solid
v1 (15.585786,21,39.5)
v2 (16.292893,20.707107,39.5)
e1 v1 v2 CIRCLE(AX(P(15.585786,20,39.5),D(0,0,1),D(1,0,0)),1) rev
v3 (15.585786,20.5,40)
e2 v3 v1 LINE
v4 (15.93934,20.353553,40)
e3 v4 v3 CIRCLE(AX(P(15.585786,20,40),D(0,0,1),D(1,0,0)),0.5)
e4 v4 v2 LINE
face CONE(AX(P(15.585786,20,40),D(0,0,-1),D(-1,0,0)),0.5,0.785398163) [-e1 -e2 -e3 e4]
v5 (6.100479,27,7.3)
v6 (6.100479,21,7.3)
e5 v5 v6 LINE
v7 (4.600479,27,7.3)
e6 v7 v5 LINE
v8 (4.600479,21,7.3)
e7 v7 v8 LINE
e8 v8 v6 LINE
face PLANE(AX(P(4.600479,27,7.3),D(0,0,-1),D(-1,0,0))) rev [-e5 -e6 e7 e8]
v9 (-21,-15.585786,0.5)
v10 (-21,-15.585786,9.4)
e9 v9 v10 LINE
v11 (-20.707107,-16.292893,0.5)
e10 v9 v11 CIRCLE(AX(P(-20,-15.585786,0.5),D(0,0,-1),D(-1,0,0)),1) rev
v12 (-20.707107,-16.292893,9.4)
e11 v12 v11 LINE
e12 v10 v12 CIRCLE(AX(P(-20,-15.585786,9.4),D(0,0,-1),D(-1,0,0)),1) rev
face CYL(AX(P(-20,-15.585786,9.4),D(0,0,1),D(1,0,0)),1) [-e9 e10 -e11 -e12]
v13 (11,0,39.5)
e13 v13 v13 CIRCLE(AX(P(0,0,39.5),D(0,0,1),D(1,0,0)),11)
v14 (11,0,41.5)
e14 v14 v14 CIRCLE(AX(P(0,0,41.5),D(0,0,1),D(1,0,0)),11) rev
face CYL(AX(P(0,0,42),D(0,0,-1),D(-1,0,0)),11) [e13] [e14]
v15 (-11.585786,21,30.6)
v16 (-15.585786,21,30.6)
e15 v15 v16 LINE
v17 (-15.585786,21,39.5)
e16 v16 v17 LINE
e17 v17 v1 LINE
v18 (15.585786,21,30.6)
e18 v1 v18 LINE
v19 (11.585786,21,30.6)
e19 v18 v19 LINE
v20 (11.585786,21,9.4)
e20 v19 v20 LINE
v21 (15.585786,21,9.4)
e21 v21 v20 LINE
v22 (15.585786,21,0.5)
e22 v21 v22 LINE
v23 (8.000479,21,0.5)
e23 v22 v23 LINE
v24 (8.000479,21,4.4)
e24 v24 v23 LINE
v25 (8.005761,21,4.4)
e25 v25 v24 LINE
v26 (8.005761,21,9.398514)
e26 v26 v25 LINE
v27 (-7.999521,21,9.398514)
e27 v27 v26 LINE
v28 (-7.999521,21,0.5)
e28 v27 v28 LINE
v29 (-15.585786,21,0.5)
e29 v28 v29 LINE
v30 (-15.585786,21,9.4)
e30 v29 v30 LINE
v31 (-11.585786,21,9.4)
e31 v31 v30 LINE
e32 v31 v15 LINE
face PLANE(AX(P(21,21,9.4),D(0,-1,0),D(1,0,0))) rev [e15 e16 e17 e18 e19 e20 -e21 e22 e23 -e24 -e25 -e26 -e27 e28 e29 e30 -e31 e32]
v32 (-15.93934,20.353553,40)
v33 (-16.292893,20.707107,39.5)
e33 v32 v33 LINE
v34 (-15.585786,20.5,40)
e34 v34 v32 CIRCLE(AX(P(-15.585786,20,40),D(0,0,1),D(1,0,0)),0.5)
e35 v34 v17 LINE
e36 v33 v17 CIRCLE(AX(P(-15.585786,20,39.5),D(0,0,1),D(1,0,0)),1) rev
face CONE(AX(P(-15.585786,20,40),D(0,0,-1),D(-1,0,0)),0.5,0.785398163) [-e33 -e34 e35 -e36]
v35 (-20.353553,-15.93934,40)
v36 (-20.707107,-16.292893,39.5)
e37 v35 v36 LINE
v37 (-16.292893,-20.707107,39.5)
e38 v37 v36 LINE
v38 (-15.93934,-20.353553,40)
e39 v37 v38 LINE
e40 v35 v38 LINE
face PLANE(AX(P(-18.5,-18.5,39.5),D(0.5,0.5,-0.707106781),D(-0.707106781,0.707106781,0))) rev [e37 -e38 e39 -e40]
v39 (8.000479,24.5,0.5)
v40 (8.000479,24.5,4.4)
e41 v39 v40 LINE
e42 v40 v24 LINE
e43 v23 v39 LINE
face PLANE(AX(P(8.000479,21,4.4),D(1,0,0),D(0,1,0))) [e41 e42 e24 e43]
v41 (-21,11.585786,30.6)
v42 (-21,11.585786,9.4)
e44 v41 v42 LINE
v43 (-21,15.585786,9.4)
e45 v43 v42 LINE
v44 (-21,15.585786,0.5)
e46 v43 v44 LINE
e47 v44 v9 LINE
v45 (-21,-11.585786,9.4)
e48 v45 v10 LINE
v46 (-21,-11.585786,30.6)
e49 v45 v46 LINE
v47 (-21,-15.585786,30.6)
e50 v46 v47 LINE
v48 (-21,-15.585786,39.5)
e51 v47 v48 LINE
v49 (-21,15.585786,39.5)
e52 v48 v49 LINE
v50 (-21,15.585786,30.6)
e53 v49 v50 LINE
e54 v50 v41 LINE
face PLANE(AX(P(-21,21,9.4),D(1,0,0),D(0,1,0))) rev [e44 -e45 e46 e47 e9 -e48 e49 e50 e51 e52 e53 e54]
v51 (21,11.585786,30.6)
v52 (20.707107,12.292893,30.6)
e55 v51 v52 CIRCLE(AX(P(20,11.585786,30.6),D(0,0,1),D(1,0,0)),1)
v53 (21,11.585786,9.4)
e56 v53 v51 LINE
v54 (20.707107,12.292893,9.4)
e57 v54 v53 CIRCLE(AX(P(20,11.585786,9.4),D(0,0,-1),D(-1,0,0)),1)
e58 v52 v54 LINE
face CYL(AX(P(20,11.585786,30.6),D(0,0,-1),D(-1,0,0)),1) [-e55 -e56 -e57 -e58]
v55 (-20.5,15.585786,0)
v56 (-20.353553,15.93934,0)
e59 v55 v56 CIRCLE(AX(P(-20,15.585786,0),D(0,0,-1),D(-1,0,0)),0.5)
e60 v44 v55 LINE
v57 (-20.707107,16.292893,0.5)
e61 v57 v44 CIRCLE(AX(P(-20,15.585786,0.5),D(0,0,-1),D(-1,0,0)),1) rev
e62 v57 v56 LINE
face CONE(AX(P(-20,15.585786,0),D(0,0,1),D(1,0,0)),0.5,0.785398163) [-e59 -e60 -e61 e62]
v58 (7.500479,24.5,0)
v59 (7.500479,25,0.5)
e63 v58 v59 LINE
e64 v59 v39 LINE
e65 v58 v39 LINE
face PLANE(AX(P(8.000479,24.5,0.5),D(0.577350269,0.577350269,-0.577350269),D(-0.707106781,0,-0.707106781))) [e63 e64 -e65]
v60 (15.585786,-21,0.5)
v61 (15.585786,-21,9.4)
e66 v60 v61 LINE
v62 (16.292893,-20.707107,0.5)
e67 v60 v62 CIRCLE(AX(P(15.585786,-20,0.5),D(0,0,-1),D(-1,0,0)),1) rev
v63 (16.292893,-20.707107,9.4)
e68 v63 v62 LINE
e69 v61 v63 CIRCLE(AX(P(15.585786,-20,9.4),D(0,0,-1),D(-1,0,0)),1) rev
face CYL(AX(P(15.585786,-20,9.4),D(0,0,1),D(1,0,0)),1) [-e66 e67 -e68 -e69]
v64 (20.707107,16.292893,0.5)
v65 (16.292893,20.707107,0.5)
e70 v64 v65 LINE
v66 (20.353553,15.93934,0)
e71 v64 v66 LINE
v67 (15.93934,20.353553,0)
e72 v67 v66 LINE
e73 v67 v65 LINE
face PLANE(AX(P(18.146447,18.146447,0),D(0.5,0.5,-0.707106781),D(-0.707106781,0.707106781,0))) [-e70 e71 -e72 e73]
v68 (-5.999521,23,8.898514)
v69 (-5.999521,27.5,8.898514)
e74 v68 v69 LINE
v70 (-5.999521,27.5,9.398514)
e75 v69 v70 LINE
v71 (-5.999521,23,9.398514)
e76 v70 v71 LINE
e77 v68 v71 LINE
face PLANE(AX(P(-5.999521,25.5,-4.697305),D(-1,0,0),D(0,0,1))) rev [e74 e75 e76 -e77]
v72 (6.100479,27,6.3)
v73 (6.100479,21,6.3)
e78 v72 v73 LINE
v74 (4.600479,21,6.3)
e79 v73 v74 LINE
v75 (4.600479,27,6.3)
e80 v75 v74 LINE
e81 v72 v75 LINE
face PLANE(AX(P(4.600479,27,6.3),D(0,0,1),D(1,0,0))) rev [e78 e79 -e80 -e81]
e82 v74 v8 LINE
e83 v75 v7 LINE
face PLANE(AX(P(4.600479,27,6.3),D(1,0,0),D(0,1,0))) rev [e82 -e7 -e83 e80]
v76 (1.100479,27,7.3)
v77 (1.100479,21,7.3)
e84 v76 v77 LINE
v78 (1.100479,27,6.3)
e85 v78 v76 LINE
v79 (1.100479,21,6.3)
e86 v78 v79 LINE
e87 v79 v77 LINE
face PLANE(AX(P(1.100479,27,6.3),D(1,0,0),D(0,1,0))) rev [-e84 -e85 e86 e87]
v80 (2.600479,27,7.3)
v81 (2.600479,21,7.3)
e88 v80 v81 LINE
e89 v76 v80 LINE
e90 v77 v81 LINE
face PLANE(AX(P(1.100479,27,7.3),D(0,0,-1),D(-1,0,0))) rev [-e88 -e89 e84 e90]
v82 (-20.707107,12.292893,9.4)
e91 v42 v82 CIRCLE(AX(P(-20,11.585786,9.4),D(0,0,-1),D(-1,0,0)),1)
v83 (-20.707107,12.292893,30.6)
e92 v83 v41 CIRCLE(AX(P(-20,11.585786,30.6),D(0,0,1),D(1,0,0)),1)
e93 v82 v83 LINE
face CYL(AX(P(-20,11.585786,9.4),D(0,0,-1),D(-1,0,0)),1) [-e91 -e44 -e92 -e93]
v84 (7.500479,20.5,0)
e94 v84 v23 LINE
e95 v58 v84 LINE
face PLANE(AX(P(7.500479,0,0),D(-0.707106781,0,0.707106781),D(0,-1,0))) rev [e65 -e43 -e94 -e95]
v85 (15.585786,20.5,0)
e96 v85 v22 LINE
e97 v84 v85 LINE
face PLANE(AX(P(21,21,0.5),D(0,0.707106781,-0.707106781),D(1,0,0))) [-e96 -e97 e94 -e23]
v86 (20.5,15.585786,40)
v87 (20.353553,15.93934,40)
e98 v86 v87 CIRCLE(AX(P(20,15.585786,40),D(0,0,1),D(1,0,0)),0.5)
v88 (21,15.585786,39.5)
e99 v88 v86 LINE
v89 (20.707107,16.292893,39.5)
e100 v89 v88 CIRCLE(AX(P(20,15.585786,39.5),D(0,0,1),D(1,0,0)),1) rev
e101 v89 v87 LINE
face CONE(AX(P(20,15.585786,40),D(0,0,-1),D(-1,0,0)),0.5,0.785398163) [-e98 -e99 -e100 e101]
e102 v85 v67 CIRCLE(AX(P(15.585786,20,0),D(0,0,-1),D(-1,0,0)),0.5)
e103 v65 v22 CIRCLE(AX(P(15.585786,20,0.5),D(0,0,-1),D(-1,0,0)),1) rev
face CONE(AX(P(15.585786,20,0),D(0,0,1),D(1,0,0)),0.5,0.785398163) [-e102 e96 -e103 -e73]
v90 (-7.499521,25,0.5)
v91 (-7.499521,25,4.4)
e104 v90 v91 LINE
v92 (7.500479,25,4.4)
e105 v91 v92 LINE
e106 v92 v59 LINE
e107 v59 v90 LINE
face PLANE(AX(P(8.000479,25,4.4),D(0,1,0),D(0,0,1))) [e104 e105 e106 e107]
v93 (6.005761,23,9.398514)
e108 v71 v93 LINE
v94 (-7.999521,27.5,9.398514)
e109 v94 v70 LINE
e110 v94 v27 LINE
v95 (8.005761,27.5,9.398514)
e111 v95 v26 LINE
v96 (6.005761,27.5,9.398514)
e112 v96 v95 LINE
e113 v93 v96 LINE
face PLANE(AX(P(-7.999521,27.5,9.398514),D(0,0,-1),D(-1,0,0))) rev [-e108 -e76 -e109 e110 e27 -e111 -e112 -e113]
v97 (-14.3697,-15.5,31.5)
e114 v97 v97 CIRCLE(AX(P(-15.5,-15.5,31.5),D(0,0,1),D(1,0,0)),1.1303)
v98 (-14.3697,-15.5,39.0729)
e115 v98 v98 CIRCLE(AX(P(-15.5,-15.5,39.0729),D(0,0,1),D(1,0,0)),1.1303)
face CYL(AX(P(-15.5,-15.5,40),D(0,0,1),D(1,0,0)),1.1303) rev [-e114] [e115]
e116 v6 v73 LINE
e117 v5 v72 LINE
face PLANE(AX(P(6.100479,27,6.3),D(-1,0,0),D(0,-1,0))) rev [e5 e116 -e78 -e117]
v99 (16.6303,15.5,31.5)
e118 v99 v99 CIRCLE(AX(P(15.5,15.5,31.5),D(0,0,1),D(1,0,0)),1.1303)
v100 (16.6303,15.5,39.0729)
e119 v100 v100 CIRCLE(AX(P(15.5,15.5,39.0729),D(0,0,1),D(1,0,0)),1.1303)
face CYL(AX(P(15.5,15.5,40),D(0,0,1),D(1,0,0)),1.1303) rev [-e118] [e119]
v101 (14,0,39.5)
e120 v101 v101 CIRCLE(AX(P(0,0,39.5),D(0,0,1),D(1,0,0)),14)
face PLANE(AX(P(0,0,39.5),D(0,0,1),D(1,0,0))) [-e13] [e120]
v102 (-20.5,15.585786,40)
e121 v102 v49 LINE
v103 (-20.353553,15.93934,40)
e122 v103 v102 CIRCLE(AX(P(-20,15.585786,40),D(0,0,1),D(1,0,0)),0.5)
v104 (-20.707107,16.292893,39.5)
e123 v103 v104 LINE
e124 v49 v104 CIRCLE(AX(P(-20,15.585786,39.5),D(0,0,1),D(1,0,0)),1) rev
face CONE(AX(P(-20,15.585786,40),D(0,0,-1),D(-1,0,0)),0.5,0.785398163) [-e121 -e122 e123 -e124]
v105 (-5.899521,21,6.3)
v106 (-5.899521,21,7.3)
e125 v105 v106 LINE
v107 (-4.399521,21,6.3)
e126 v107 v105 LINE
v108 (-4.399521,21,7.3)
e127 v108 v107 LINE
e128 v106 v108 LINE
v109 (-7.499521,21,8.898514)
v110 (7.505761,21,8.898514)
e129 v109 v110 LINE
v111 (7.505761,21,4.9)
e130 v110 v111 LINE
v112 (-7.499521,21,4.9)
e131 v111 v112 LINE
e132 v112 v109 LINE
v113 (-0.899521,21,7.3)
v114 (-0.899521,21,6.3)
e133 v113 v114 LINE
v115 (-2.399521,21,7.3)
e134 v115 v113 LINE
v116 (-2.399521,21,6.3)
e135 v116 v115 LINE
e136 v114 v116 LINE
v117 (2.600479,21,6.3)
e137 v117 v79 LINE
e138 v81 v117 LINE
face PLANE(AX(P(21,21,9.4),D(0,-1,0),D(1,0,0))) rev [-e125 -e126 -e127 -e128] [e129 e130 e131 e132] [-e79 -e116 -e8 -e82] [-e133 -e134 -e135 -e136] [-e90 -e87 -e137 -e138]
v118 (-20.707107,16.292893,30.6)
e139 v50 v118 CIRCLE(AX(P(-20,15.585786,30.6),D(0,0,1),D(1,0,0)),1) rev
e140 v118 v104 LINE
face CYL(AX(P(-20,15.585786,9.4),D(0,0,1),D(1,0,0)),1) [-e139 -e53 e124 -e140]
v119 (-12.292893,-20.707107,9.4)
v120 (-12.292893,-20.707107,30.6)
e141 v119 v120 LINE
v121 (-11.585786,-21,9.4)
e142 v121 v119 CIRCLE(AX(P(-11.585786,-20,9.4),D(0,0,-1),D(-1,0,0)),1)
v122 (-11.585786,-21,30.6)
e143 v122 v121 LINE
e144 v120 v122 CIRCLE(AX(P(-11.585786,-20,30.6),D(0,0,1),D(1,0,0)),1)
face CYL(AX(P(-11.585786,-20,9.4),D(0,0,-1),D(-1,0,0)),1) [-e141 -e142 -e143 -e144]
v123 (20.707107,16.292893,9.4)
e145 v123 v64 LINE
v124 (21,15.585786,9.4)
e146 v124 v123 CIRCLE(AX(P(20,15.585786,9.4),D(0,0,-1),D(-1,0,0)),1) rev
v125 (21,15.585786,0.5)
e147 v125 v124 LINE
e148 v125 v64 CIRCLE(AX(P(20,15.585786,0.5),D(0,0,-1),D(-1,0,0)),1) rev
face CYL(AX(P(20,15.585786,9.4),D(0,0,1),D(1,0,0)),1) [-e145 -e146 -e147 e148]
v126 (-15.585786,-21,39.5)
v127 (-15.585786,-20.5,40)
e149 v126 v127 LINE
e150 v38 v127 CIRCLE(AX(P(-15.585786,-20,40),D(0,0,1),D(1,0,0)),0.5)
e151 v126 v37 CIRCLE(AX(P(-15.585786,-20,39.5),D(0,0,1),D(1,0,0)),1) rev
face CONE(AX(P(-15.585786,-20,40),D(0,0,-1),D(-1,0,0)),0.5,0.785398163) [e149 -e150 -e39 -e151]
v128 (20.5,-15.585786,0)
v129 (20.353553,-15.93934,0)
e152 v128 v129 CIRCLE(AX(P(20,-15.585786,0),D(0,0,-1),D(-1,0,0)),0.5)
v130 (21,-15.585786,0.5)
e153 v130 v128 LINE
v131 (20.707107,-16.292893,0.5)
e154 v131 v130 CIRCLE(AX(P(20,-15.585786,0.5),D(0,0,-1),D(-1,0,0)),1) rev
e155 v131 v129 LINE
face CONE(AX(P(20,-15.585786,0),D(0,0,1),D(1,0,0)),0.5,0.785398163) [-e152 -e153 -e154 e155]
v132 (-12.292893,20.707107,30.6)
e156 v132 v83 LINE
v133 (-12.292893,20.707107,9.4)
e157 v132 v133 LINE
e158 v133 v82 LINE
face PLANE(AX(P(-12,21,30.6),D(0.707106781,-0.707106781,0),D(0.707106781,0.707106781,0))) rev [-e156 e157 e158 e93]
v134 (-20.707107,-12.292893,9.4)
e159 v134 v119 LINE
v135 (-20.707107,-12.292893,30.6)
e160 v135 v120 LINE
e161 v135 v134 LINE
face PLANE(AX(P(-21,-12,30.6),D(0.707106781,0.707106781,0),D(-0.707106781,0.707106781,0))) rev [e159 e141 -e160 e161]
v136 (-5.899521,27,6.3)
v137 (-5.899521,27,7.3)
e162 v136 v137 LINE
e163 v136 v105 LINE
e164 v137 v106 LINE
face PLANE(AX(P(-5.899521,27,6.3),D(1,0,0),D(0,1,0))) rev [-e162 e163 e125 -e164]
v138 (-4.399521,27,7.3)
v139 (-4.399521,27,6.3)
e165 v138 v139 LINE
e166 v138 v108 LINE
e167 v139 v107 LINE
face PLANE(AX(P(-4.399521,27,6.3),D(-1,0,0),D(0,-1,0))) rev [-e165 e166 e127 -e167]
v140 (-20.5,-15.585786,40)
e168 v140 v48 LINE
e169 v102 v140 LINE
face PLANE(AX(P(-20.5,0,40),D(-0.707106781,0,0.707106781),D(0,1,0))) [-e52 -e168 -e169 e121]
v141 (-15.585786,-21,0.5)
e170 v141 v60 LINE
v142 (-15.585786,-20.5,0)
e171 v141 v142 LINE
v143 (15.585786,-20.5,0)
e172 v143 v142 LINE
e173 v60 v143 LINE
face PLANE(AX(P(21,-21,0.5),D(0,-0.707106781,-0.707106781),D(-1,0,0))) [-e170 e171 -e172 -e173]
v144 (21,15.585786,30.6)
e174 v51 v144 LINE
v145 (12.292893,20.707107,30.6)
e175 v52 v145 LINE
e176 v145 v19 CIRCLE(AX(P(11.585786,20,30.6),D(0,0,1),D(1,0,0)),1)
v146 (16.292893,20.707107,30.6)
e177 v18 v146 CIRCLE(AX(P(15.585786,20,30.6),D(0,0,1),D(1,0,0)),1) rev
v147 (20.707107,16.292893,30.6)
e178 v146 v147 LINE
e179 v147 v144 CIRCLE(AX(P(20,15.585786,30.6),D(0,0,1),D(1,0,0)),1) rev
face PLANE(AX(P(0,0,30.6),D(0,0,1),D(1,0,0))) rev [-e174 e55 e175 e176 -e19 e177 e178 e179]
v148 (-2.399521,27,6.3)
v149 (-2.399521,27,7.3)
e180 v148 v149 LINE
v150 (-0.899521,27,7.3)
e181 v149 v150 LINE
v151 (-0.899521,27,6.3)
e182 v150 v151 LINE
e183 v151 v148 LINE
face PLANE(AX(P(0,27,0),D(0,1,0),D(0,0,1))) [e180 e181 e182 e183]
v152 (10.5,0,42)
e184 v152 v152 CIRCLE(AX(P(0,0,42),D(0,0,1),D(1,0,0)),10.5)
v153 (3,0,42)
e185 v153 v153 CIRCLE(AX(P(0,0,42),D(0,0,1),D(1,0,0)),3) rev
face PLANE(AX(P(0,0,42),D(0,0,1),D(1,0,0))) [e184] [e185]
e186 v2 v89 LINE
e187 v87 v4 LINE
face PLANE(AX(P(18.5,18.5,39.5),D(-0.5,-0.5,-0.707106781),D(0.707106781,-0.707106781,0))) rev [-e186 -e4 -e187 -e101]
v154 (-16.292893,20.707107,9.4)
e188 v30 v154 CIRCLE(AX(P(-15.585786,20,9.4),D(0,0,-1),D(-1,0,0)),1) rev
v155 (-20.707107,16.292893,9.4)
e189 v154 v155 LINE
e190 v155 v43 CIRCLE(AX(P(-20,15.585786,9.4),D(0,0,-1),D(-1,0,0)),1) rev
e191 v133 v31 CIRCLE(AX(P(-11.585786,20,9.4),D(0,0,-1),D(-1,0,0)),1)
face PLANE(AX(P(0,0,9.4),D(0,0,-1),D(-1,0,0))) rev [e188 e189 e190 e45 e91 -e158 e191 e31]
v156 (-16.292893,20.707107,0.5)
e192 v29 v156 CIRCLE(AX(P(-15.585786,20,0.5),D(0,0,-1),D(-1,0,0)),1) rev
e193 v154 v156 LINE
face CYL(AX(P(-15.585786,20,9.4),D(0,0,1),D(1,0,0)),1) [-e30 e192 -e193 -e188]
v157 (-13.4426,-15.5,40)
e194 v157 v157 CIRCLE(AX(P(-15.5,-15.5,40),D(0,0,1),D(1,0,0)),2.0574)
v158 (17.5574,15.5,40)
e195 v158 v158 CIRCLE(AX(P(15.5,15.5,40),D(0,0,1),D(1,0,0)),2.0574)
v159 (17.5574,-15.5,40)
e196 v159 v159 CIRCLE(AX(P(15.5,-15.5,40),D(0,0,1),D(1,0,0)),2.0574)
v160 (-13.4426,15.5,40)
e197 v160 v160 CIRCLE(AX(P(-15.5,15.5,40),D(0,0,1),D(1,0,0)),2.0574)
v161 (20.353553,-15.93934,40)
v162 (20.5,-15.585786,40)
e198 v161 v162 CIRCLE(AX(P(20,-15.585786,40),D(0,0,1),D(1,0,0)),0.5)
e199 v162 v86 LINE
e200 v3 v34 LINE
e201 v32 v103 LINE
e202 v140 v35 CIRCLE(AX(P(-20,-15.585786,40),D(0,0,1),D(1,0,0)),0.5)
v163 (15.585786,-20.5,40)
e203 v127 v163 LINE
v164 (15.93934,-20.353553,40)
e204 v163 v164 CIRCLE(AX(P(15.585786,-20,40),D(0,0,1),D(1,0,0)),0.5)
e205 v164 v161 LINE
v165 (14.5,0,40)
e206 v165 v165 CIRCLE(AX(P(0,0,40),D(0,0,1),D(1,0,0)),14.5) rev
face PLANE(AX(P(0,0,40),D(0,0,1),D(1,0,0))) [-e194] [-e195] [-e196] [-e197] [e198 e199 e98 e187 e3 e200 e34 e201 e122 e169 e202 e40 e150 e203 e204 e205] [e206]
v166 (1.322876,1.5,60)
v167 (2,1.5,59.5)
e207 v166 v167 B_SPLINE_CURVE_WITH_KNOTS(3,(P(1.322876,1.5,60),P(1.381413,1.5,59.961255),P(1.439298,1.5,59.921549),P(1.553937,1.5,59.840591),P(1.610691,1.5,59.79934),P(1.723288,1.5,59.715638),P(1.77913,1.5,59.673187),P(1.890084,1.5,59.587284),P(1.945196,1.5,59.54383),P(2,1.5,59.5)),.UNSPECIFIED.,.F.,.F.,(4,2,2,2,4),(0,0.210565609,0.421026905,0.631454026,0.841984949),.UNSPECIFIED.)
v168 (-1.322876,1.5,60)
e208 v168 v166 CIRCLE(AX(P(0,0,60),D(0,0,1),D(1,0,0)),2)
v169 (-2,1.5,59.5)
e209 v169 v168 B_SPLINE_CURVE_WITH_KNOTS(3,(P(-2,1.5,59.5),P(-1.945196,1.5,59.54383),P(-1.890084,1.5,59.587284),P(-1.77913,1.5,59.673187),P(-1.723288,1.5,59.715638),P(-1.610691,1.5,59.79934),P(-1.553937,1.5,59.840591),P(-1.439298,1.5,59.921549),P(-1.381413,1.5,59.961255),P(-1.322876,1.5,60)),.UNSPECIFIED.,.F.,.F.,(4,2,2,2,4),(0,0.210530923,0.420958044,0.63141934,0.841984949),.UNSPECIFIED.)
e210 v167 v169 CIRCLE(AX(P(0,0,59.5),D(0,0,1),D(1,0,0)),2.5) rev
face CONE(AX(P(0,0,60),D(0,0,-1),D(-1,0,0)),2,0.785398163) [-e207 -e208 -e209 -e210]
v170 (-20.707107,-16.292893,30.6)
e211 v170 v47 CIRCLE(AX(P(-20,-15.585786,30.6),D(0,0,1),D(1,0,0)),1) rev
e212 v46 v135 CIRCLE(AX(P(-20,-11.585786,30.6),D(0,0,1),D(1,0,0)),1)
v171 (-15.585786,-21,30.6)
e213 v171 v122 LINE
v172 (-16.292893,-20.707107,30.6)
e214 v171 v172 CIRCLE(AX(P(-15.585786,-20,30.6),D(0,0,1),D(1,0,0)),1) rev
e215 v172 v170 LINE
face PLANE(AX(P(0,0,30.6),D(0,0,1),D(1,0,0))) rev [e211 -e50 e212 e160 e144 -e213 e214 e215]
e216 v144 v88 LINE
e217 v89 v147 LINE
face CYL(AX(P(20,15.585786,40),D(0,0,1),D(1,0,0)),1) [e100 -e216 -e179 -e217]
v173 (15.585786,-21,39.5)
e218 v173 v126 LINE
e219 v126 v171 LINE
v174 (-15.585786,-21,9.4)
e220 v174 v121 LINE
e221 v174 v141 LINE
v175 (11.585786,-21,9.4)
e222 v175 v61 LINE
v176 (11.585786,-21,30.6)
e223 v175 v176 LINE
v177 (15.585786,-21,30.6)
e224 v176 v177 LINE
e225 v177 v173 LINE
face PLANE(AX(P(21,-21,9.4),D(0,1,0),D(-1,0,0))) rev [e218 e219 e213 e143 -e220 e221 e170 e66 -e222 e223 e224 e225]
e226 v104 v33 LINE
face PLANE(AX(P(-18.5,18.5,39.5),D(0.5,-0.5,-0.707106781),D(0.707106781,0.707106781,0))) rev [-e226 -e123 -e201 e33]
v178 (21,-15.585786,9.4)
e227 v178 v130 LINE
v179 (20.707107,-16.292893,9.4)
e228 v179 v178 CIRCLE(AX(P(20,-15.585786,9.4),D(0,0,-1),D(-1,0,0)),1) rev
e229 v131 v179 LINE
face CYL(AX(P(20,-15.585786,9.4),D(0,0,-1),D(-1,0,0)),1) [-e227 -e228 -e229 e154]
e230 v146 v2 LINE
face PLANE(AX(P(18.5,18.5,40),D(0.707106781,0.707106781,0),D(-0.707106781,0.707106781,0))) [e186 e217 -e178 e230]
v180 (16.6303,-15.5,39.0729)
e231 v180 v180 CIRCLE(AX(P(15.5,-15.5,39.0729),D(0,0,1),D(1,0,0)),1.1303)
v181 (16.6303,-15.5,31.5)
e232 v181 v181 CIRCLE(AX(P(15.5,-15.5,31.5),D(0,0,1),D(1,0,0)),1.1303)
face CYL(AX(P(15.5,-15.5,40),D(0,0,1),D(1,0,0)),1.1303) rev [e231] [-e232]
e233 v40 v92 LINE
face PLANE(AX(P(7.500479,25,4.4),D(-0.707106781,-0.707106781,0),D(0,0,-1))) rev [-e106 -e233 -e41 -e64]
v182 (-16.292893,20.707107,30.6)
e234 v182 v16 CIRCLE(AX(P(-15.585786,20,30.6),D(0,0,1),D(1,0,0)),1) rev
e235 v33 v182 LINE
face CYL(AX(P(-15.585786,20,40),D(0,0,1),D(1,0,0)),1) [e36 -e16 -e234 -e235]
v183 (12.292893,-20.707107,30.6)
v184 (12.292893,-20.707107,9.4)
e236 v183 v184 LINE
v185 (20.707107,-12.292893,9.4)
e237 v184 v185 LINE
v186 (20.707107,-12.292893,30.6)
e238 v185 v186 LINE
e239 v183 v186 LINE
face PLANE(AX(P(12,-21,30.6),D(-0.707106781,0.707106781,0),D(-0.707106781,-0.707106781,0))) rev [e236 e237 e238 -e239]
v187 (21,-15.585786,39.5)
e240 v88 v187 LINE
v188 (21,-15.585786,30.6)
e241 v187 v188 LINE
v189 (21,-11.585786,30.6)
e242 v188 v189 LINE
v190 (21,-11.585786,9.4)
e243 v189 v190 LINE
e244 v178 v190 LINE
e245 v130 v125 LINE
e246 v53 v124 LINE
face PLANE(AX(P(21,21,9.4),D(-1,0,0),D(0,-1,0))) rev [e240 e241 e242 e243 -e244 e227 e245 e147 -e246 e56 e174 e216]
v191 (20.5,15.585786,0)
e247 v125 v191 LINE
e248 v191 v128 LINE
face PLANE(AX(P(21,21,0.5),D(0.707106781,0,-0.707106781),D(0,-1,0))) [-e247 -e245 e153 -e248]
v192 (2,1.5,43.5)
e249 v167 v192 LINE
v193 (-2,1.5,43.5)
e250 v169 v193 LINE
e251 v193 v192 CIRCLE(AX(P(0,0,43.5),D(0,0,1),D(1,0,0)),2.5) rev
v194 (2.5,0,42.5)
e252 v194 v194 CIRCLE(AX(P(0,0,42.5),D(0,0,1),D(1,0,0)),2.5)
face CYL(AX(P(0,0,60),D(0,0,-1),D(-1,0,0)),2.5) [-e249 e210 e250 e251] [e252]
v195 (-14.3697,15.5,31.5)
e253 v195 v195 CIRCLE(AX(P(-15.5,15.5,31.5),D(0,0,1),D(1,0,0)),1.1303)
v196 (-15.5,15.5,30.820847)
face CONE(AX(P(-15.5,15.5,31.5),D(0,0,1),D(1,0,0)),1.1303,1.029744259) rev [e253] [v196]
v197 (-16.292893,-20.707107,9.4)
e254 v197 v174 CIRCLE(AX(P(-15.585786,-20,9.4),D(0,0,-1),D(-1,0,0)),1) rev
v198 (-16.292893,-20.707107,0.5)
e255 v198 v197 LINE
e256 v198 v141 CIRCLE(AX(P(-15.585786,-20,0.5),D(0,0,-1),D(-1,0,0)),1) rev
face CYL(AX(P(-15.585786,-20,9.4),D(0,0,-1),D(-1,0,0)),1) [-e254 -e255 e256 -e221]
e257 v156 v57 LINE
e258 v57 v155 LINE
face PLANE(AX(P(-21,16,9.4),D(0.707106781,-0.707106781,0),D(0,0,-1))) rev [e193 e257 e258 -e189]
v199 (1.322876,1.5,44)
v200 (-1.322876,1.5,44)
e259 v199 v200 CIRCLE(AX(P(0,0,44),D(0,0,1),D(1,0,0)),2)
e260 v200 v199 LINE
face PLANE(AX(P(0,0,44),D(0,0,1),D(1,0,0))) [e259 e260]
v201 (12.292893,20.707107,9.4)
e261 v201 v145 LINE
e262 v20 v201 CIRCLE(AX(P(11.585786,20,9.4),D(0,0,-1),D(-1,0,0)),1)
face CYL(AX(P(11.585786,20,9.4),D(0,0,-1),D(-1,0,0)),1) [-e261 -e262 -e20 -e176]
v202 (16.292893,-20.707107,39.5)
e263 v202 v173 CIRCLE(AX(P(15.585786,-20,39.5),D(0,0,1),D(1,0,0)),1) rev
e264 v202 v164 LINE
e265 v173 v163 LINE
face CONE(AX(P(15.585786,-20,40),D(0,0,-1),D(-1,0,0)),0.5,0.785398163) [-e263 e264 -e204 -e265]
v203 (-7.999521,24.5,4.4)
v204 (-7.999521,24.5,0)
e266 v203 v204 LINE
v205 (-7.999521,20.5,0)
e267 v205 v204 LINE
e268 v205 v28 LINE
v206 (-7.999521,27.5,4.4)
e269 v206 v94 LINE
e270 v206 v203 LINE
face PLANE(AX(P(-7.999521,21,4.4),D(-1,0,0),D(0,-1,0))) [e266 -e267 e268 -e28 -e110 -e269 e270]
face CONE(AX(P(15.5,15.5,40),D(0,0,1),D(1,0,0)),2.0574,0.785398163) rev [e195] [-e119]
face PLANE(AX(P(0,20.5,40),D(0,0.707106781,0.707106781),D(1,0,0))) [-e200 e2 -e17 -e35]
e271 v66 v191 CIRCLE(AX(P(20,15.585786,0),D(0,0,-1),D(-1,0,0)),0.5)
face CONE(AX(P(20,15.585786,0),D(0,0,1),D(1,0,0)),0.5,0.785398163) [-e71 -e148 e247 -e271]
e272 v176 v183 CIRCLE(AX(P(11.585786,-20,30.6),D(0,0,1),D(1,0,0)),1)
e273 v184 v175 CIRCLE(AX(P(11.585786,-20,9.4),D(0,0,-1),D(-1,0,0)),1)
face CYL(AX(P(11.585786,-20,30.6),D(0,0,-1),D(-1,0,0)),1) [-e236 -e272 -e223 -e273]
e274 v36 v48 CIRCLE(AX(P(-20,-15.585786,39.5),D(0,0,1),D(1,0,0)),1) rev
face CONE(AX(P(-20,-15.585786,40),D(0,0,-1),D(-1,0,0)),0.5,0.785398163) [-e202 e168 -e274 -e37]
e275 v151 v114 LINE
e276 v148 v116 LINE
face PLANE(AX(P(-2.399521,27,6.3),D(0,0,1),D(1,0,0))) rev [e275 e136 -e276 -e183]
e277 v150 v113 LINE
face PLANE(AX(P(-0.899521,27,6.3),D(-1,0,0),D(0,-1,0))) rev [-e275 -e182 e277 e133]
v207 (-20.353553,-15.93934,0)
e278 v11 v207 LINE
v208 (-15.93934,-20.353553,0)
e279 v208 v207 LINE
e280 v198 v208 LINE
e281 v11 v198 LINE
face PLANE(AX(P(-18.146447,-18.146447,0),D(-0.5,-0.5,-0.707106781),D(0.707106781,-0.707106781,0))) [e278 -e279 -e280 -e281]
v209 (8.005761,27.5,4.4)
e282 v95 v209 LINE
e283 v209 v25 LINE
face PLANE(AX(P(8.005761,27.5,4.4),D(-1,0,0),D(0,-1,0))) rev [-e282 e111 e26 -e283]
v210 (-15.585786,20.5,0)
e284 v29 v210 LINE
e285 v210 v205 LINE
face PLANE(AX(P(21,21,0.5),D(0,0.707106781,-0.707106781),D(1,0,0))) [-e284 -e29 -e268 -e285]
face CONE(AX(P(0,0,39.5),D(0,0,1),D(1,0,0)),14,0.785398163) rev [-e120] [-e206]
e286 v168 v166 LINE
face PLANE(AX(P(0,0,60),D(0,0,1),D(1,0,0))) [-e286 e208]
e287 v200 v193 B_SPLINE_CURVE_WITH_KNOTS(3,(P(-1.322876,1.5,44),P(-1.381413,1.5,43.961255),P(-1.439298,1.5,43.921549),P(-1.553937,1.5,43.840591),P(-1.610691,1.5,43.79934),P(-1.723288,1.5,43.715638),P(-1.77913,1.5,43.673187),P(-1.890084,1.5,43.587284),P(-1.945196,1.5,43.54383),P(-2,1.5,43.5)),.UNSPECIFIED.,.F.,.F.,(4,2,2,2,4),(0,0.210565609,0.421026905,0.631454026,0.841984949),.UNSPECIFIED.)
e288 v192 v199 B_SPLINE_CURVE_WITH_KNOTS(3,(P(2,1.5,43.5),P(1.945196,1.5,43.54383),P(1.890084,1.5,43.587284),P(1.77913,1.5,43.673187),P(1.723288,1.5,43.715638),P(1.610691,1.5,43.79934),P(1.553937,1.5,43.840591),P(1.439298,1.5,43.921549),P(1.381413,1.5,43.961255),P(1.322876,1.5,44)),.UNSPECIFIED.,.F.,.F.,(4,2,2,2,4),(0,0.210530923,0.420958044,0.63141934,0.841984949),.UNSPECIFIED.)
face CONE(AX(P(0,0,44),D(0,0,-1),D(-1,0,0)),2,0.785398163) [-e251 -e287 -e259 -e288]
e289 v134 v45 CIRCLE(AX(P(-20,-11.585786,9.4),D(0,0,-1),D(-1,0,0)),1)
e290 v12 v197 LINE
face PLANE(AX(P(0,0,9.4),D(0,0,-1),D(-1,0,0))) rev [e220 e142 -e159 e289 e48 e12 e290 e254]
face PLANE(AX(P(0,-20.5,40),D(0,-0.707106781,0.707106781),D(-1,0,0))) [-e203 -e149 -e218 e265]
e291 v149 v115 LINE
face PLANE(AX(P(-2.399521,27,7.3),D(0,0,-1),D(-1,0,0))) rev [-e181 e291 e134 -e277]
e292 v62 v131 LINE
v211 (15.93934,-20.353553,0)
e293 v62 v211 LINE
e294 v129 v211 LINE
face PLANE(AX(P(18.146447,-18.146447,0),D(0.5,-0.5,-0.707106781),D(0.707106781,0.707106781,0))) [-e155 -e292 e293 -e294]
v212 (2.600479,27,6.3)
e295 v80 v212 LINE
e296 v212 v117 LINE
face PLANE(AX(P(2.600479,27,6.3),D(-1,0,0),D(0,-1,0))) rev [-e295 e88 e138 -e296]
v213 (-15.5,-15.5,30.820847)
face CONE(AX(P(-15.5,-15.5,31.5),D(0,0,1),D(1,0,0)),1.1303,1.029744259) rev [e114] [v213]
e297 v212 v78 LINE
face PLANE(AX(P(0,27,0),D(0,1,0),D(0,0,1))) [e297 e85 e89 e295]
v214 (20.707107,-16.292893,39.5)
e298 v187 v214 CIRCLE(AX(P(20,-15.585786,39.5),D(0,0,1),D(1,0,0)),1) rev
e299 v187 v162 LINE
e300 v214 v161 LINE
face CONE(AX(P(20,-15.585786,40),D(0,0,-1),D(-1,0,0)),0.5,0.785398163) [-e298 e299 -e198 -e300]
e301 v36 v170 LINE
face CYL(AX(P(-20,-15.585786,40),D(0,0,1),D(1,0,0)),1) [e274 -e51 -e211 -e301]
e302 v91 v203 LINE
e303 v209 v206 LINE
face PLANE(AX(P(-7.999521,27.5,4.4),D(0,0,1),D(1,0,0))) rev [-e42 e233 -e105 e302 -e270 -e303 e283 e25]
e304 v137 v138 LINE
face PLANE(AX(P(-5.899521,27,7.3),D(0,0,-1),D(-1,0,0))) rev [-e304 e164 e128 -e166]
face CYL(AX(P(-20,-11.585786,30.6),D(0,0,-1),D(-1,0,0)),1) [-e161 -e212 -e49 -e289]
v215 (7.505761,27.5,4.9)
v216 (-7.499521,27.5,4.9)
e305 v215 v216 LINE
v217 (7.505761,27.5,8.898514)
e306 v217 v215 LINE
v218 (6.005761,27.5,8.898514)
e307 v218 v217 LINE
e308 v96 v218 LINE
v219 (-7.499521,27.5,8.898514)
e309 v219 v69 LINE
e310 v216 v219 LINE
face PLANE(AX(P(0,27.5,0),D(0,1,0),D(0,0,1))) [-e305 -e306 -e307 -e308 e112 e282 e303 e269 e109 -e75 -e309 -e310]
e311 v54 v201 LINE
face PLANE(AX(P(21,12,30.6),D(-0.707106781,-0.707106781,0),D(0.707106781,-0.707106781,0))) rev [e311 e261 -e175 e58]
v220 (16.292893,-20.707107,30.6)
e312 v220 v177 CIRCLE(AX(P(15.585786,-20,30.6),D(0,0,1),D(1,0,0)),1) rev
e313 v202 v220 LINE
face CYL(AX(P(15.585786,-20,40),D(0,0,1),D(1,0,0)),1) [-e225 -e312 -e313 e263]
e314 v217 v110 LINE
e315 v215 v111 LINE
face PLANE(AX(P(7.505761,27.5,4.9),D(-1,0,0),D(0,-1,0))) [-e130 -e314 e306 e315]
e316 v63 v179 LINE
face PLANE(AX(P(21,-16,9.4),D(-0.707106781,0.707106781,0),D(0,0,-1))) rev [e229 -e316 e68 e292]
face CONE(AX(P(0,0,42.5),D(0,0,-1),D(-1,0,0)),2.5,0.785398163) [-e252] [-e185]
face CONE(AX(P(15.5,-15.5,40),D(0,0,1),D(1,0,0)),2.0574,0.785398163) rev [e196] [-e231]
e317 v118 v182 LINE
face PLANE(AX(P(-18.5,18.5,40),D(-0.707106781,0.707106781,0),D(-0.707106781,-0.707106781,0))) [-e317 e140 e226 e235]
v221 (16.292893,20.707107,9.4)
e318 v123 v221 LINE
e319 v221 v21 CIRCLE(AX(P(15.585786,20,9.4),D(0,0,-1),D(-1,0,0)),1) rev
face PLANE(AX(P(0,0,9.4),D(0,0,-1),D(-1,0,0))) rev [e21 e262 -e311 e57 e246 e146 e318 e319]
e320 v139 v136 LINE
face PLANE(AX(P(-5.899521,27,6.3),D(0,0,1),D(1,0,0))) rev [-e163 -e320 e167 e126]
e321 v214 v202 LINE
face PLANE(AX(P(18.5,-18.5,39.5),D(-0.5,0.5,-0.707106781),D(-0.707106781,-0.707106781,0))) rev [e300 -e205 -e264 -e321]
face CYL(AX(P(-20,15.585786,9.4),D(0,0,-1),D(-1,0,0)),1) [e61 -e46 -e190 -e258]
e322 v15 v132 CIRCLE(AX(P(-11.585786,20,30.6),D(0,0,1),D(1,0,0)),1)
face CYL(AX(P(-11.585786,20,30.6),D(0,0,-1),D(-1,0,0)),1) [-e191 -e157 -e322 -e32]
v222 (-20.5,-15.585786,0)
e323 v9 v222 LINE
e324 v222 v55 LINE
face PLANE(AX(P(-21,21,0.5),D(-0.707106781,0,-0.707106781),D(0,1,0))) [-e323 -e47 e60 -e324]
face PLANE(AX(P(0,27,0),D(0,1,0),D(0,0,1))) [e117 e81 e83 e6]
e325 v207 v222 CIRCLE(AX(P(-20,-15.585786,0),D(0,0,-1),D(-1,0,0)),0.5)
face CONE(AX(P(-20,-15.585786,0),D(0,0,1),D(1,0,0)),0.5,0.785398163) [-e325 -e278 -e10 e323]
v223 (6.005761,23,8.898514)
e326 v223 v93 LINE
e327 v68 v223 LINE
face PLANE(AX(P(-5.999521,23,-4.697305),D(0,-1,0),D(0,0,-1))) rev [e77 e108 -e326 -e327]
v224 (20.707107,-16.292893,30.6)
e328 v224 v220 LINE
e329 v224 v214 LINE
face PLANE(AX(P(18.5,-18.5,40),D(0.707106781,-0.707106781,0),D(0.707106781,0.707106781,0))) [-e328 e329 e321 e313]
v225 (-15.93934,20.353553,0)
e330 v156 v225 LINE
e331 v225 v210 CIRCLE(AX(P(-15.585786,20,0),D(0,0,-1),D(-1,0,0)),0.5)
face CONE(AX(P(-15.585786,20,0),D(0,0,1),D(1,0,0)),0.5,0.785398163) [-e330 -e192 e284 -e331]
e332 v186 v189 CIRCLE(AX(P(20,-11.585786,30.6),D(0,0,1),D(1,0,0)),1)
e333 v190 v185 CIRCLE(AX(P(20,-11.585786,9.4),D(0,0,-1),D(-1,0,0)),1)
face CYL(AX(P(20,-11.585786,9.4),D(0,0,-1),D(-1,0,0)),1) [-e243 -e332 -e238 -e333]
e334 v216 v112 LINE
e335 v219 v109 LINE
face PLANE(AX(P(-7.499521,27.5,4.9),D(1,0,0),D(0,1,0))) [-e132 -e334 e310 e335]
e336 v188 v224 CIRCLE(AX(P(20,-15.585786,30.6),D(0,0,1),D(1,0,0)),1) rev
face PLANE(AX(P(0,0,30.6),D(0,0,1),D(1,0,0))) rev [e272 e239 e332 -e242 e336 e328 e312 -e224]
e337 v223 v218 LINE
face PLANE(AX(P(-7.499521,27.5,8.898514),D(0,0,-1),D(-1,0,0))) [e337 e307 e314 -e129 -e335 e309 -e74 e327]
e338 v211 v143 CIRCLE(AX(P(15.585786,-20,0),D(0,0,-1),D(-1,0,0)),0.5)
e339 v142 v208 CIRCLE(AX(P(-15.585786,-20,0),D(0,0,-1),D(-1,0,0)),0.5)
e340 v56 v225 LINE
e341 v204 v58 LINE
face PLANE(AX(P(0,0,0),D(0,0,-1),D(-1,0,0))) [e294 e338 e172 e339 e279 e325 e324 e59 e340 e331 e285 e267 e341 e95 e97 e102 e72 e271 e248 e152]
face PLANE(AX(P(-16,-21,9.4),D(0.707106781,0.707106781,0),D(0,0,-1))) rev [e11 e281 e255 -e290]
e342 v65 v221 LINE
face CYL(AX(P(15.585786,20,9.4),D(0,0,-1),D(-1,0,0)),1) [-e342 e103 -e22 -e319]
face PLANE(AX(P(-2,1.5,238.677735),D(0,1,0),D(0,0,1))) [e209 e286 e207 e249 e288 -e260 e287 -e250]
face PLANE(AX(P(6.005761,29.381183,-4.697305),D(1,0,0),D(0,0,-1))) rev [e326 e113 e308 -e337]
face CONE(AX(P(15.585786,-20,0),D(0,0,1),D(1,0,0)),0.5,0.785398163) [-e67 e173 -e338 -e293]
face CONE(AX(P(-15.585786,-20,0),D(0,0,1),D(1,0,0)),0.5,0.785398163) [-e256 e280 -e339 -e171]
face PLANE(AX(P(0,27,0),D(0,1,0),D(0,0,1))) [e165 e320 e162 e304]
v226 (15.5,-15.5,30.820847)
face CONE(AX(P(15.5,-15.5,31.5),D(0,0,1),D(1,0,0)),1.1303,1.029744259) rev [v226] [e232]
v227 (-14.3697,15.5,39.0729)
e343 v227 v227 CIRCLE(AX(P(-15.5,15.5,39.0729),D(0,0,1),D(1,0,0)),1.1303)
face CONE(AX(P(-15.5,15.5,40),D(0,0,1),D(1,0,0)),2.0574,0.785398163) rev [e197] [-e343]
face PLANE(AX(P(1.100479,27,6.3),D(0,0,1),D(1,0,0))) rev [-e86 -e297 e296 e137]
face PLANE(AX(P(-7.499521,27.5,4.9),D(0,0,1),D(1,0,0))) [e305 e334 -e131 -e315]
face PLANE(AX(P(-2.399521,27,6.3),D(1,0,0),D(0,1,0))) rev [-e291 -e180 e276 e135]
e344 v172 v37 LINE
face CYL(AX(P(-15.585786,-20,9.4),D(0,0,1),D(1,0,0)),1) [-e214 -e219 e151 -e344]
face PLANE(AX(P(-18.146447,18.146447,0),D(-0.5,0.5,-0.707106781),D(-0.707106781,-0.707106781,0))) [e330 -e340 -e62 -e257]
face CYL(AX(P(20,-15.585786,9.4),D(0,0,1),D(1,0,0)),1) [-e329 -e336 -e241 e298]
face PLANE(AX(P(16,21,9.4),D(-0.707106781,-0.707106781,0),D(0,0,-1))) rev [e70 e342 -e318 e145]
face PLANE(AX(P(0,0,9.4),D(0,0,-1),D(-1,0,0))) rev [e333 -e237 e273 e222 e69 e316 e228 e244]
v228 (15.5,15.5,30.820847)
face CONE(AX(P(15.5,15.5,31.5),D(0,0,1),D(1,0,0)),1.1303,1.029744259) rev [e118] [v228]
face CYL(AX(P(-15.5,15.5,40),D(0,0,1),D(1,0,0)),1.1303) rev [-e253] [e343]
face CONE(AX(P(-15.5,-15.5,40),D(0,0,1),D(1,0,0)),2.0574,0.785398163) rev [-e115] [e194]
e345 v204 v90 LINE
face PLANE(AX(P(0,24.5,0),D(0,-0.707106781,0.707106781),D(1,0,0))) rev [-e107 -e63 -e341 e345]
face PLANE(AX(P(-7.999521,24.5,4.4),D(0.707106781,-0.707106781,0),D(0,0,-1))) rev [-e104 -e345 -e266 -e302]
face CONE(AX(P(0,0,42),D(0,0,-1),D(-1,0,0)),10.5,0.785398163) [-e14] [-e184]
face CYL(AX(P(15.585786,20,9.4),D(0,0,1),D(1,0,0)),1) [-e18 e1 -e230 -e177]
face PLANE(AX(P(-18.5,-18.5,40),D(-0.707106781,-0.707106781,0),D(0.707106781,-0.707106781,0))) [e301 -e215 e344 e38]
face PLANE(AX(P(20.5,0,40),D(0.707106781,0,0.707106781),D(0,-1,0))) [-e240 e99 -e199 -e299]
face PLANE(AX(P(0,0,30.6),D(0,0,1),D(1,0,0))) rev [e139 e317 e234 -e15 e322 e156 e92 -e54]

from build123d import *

# Parameters (mm, degrees)
SKETCH1_W               = 42
SKETCH1_H               = 42
BOSS_EXTRUDE1_DEPTH     = 9.4
CHAMFER1_SIZE           = 5
BOSS_EXTRUDE3_DEPTH     = 21.2
BOSS_EXTRUDE6_DEPTH     = 9.4
SKETCH6_W               = 16
SKETCH6_H               = 4
BOSS_EXTRUDE7_DEPTH     = 4.4
SKETCH7_W               = 16.005281852
SKETCH7_H               = 4.99851403
SKETCH7_W_2             = 15.005281852
SKETCH7_H_2             = 3.99851403
BOSS_EXTRUDE8_DEPTH     = 6.5
CUT_EXTRUDE1_DEPTH      = 0.5
SKETCH9_W               = 1.5
SKETCH9_H               = 1
BOSS_EXTRUDE9_DEPTH     = 6
SKETCH10_R              = 11
BOSS_EXTRUDE10_DEPTH    = 2
SKETCH11_R              = 2.5
BOSS_EXTRUDE11_DEPTH    = 18
CUT_EXTRUDE3_DEPTH      = 70.262183044
CUT_EXTRUDE3_DEPTH_BACK = 16
CUT_EXTRUDE4_START      = -0.5
SKETCH13_R              = 14
SKETCH13_R_2            = 11
CUT_EXTRUDE4_DEPTH      = 0.5
CIRPATTERN2_COUNT       = 4
CHAMFER3_SIZE           = 0.5
FILLET1_R               = 1
CHAMFER4_SIZE           = 0.5


with BuildPart() as part:
    # Sketch1 → Boss-Extrude1 (new body)
    with BuildSketch(Plane.XY):
        Rectangle(SKETCH1_W, SKETCH1_H)
    extrude(amount=BOSS_EXTRUDE1_DEPTH)

    # Chamfer1
    chamfer1_edges = [part.edges().sort_by_distance(p)[0] for p in [
        (-21, 21, 4.7),
        (21, 21, 4.7),
        (21, -21, 4.7),
        (-21, -21, 4.7),
    ]]
    chamfer(chamfer1_edges, length=CHAMFER1_SIZE)

    # Sketch3 → Boss-Extrude3 (add)
    with BuildSketch(Plane.XY.offset(9.4)):
        Polygon((-12, 21), (-21, 12), (-21, -12), (-12, -21), (12, -21), (21, -12), (21, 12), (12, 21), align=None)
    extrude(amount=BOSS_EXTRUDE3_DEPTH)

    # Sketch5 → Boss-Extrude6 (add)
    with BuildSketch(Plane.XY.offset(30.6)):
        Polygon((21, 12), (12, 21), (-12, 21), (-21, 12), (-21, -12), (-12, -21), (12, -21), (21, -12), align=None)
        Polygon((-12, 21), (-16, 21), (-21, 16), (-21, 12), align=None)
        Polygon((16, 21), (12, 21), (21, 12), (21, 16), align=None)
        Polygon((21, -16), (21, -12), (12, -21), (16, -21), align=None)
        Polygon((-12, -21), (-21, -12), (-21, -16), (-16, -21), align=None)
    extrude(amount=BOSS_EXTRUDE6_DEPTH)

    # Sketch6 → Boss-Extrude7 (add)
    with BuildSketch(Plane(origin=(0, 0, 0), x_dir=(-1, 0, 0), z_dir=(0, 0, -1))):
        with Locations((-0.000479461, 23)):
            Rectangle(SKETCH6_W, SKETCH6_H)
    extrude(amount=-BOSS_EXTRUDE7_DEPTH)

    # Sketch7 → Boss-Extrude8 (add)
    with BuildSketch(Plane(origin=(0, 21, 0), x_dir=(1, 0, 0), z_dir=(0, 1, 0))):
        with Locations((0.003120387, -6.899257015)):
            Rectangle(SKETCH7_W, SKETCH7_H)
        with Locations((0.003120387, -6.899257015)):
            Rectangle(SKETCH7_W_2, SKETCH7_H_2, mode=Mode.SUBTRACT)
    extrude(amount=BOSS_EXTRUDE8_DEPTH)

    # Sketch8 → Cut-Extrude1 (cut)
    with BuildSketch(Plane.XY.offset(9.39851403)):
        Polygon((-5.999520539, 25.5), (-5.999520539, 29.381183142), (6.005761313, 29.381183142), (6.005761313, 25.5), (6.005761313, 23), (-5.999520539, 23), align=None)
    extrude(amount=-CUT_EXTRUDE1_DEPTH, mode=Mode.SUBTRACT)

    # Sketch9 → Boss-Extrude9 (add)
    with BuildSketch(Plane(origin=(0, 21, 0), x_dir=(1, 0, 0), z_dir=(0, 1, 0))):
        with Locations((-5.149520539, -6.8)):
            Rectangle(SKETCH9_W, SKETCH9_H)
        with Locations((-1.649520539, -6.8)):
            Rectangle(SKETCH9_W, SKETCH9_H)
        with Locations((1.850479461, -6.8)):
            Rectangle(SKETCH9_W, SKETCH9_H)
        with Locations((5.350479461, -6.8)):
            Rectangle(SKETCH9_W, SKETCH9_H)
    extrude(amount=BOSS_EXTRUDE9_DEPTH)

    # Sketch10 → Boss-Extrude10 (add)
    with BuildSketch(Plane.XY.offset(40)):
        Circle(SKETCH10_R)
    extrude(amount=BOSS_EXTRUDE10_DEPTH)

    # Sketch11 → Boss-Extrude11 (add)
    with BuildSketch(Plane.XY.offset(42)):
        Circle(SKETCH11_R)
    extrude(amount=BOSS_EXTRUDE11_DEPTH)

    # Sketch12 → Cut-Extrude3 (cut, two sides: drawn at the far end of the back side and taken through both)
    with BuildSketch(Plane.XY.offset(60).offset(-CUT_EXTRUDE3_DEPTH_BACK)):
        Polygon((-81.426219831, 1.5), (-2, 1.5), (2, 1.5), (81.426219831, 1.5), (81.426219831, 160.352439662), (-81.426219831, 160.352439662), align=None)
    extrude(amount=CUT_EXTRUDE3_DEPTH + CUT_EXTRUDE3_DEPTH_BACK, mode=Mode.SUBTRACT)

    # Sketch13 → Cut-Extrude4 (cut)
    with BuildSketch(Plane.XY.offset(40).offset(CUT_EXTRUDE4_START)):
        Circle(SKETCH13_R)
        Circle(SKETCH13_R_2, mode=Mode.SUBTRACT)
    extrude(amount=CUT_EXTRUDE4_DEPTH, mode=Mode.SUBTRACT)

    # Sketch15 → #4-40 Tapped Hole1 (revolve, cut)
    with BuildSketch(Plane(origin=(-15.5, 15.5, 40), x_dir=(0, -1, 0), z_dir=(1, 0, 0))):
        Polygon((0, 0), (0, 9.179152758), (1.1303, 8.5), (1.1303, 0.9271), (2.0574, 0), align=None)
    f_4_40_tapped_hole1 = revolve(axis=Axis((-15.5, 15.5, 46.35), (0, 0, -1)), mode=Mode.SUBTRACT)

    # CirPattern2: #4-40 Tapped Hole1 ×4 about axis
    cirpattern2_axis = Axis((0, 0, 0), (0, 0, 1))
    for i in range(1, CIRPATTERN2_COUNT):
        add(f_4_40_tapped_hole1.rotate(cirpattern2_axis, i * 360 / CIRPATTERN2_COUNT), mode=Mode.SUBTRACT)

    # Chamfer3
    chamfer3_edges = [part.edges().sort_by_distance(p)[0] for p in [
        (-11, 0, 42),
        (-2.5, 0, 42),
        (-0.790569415, -2.371708245, 60),
        (0, 2.5, 44),
        (-14, 0, 40),
    ]]
    chamfer(chamfer3_edges, length=CHAMFER3_SIZE - 0.0001)  # a hair under: the kernel refuses the full size

    # Fillet1
    fillet1_edges = [part.edges().sort_by_distance(p)[0] for p in [
        (21, 16, 4.7),
        (21, -16, 4.7),
        (-16, -21, 4.7),
        (16, -21, 4.7),
        (-21, 16, 4.7),
        (-21, -16, 4.7),
        (16, 21, 4.7),
        (-16, 21, 4.7),
        (12, 21, 20),
        (-12, 21, 20),
        (-21, 12, 20),
        (-21, -12, 20),
        (-12, -21, 20),
        (12, -21, 20),
        (21, -12, 20),
        (21, 12, 20),
        (21, -16, 35.3),
        (21, 16, 35.3),
        (16, 21, 35.3),
        (-16, 21, 35.3),
        (-21, 16, 35.3),
        (-21, -16, 35.3),
        (-16, -21, 35.3),
        (16, -21, 35.3),
    ]]
    fillet(fillet1_edges, radius=FILLET1_R)

    # Chamfer4
    chamfer4_edges = [part.edges().sort_by_distance(p)[0] for p in [
        (-11.792653488, 21, 0),
        (8.000479461, 25, 2.2),
        (-7.999520539, 25, 2.2),
        (8.000479461, 23, 0),
        (0.000479461, 25, 0),
        (0, 21, 40),
        (11.79313295, 21, 0),
        (-18.5, 18.5, 0),
        (21, 0, 0),
        (18.5, -18.5, 0),
        (0, -21, 0),
        (-18.5, -18.5, 0),
        (-21, 0, 0),
        (18.5, 18.5, 0),
        (20.923879533, 15.96846987, 0),
        (15.96846987, 20.923879533, 0),
        (20.923879533, -15.96846987, 0),
        (15.96846987, -20.923879533, 0),
        (-15.96846987, -20.923879533, 0),
        (-20.923879533, -15.96846987, 0),
        (-20.923879533, 15.96846987, 0),
        (-15.96846987, 20.923879533, 0),
        (-18.5, 18.5, 40),
        (21, 0, 40),
        (18.5, 18.5, 40),
        (-21, 0, 40),
        (-18.5, -18.5, 40),
        (0, -21, 40),
        (18.5, -18.5, 40),
        (15.96846987, 20.923879533, 40),
        (20.923879533, 15.96846987, 40),
        (20.923879533, -15.96846987, 40),
        (15.96846987, -20.923879533, 40),
        (-15.96846987, -20.923879533, 40),
        (-20.923879533, -15.96846987, 40),
        (-20.923879533, 15.96846987, 40),
        (-15.96846987, 20.923879533, 40),
    ]]
    chamfer(chamfer4_edges, length=CHAMFER4_SIZE)


solid = part.part
